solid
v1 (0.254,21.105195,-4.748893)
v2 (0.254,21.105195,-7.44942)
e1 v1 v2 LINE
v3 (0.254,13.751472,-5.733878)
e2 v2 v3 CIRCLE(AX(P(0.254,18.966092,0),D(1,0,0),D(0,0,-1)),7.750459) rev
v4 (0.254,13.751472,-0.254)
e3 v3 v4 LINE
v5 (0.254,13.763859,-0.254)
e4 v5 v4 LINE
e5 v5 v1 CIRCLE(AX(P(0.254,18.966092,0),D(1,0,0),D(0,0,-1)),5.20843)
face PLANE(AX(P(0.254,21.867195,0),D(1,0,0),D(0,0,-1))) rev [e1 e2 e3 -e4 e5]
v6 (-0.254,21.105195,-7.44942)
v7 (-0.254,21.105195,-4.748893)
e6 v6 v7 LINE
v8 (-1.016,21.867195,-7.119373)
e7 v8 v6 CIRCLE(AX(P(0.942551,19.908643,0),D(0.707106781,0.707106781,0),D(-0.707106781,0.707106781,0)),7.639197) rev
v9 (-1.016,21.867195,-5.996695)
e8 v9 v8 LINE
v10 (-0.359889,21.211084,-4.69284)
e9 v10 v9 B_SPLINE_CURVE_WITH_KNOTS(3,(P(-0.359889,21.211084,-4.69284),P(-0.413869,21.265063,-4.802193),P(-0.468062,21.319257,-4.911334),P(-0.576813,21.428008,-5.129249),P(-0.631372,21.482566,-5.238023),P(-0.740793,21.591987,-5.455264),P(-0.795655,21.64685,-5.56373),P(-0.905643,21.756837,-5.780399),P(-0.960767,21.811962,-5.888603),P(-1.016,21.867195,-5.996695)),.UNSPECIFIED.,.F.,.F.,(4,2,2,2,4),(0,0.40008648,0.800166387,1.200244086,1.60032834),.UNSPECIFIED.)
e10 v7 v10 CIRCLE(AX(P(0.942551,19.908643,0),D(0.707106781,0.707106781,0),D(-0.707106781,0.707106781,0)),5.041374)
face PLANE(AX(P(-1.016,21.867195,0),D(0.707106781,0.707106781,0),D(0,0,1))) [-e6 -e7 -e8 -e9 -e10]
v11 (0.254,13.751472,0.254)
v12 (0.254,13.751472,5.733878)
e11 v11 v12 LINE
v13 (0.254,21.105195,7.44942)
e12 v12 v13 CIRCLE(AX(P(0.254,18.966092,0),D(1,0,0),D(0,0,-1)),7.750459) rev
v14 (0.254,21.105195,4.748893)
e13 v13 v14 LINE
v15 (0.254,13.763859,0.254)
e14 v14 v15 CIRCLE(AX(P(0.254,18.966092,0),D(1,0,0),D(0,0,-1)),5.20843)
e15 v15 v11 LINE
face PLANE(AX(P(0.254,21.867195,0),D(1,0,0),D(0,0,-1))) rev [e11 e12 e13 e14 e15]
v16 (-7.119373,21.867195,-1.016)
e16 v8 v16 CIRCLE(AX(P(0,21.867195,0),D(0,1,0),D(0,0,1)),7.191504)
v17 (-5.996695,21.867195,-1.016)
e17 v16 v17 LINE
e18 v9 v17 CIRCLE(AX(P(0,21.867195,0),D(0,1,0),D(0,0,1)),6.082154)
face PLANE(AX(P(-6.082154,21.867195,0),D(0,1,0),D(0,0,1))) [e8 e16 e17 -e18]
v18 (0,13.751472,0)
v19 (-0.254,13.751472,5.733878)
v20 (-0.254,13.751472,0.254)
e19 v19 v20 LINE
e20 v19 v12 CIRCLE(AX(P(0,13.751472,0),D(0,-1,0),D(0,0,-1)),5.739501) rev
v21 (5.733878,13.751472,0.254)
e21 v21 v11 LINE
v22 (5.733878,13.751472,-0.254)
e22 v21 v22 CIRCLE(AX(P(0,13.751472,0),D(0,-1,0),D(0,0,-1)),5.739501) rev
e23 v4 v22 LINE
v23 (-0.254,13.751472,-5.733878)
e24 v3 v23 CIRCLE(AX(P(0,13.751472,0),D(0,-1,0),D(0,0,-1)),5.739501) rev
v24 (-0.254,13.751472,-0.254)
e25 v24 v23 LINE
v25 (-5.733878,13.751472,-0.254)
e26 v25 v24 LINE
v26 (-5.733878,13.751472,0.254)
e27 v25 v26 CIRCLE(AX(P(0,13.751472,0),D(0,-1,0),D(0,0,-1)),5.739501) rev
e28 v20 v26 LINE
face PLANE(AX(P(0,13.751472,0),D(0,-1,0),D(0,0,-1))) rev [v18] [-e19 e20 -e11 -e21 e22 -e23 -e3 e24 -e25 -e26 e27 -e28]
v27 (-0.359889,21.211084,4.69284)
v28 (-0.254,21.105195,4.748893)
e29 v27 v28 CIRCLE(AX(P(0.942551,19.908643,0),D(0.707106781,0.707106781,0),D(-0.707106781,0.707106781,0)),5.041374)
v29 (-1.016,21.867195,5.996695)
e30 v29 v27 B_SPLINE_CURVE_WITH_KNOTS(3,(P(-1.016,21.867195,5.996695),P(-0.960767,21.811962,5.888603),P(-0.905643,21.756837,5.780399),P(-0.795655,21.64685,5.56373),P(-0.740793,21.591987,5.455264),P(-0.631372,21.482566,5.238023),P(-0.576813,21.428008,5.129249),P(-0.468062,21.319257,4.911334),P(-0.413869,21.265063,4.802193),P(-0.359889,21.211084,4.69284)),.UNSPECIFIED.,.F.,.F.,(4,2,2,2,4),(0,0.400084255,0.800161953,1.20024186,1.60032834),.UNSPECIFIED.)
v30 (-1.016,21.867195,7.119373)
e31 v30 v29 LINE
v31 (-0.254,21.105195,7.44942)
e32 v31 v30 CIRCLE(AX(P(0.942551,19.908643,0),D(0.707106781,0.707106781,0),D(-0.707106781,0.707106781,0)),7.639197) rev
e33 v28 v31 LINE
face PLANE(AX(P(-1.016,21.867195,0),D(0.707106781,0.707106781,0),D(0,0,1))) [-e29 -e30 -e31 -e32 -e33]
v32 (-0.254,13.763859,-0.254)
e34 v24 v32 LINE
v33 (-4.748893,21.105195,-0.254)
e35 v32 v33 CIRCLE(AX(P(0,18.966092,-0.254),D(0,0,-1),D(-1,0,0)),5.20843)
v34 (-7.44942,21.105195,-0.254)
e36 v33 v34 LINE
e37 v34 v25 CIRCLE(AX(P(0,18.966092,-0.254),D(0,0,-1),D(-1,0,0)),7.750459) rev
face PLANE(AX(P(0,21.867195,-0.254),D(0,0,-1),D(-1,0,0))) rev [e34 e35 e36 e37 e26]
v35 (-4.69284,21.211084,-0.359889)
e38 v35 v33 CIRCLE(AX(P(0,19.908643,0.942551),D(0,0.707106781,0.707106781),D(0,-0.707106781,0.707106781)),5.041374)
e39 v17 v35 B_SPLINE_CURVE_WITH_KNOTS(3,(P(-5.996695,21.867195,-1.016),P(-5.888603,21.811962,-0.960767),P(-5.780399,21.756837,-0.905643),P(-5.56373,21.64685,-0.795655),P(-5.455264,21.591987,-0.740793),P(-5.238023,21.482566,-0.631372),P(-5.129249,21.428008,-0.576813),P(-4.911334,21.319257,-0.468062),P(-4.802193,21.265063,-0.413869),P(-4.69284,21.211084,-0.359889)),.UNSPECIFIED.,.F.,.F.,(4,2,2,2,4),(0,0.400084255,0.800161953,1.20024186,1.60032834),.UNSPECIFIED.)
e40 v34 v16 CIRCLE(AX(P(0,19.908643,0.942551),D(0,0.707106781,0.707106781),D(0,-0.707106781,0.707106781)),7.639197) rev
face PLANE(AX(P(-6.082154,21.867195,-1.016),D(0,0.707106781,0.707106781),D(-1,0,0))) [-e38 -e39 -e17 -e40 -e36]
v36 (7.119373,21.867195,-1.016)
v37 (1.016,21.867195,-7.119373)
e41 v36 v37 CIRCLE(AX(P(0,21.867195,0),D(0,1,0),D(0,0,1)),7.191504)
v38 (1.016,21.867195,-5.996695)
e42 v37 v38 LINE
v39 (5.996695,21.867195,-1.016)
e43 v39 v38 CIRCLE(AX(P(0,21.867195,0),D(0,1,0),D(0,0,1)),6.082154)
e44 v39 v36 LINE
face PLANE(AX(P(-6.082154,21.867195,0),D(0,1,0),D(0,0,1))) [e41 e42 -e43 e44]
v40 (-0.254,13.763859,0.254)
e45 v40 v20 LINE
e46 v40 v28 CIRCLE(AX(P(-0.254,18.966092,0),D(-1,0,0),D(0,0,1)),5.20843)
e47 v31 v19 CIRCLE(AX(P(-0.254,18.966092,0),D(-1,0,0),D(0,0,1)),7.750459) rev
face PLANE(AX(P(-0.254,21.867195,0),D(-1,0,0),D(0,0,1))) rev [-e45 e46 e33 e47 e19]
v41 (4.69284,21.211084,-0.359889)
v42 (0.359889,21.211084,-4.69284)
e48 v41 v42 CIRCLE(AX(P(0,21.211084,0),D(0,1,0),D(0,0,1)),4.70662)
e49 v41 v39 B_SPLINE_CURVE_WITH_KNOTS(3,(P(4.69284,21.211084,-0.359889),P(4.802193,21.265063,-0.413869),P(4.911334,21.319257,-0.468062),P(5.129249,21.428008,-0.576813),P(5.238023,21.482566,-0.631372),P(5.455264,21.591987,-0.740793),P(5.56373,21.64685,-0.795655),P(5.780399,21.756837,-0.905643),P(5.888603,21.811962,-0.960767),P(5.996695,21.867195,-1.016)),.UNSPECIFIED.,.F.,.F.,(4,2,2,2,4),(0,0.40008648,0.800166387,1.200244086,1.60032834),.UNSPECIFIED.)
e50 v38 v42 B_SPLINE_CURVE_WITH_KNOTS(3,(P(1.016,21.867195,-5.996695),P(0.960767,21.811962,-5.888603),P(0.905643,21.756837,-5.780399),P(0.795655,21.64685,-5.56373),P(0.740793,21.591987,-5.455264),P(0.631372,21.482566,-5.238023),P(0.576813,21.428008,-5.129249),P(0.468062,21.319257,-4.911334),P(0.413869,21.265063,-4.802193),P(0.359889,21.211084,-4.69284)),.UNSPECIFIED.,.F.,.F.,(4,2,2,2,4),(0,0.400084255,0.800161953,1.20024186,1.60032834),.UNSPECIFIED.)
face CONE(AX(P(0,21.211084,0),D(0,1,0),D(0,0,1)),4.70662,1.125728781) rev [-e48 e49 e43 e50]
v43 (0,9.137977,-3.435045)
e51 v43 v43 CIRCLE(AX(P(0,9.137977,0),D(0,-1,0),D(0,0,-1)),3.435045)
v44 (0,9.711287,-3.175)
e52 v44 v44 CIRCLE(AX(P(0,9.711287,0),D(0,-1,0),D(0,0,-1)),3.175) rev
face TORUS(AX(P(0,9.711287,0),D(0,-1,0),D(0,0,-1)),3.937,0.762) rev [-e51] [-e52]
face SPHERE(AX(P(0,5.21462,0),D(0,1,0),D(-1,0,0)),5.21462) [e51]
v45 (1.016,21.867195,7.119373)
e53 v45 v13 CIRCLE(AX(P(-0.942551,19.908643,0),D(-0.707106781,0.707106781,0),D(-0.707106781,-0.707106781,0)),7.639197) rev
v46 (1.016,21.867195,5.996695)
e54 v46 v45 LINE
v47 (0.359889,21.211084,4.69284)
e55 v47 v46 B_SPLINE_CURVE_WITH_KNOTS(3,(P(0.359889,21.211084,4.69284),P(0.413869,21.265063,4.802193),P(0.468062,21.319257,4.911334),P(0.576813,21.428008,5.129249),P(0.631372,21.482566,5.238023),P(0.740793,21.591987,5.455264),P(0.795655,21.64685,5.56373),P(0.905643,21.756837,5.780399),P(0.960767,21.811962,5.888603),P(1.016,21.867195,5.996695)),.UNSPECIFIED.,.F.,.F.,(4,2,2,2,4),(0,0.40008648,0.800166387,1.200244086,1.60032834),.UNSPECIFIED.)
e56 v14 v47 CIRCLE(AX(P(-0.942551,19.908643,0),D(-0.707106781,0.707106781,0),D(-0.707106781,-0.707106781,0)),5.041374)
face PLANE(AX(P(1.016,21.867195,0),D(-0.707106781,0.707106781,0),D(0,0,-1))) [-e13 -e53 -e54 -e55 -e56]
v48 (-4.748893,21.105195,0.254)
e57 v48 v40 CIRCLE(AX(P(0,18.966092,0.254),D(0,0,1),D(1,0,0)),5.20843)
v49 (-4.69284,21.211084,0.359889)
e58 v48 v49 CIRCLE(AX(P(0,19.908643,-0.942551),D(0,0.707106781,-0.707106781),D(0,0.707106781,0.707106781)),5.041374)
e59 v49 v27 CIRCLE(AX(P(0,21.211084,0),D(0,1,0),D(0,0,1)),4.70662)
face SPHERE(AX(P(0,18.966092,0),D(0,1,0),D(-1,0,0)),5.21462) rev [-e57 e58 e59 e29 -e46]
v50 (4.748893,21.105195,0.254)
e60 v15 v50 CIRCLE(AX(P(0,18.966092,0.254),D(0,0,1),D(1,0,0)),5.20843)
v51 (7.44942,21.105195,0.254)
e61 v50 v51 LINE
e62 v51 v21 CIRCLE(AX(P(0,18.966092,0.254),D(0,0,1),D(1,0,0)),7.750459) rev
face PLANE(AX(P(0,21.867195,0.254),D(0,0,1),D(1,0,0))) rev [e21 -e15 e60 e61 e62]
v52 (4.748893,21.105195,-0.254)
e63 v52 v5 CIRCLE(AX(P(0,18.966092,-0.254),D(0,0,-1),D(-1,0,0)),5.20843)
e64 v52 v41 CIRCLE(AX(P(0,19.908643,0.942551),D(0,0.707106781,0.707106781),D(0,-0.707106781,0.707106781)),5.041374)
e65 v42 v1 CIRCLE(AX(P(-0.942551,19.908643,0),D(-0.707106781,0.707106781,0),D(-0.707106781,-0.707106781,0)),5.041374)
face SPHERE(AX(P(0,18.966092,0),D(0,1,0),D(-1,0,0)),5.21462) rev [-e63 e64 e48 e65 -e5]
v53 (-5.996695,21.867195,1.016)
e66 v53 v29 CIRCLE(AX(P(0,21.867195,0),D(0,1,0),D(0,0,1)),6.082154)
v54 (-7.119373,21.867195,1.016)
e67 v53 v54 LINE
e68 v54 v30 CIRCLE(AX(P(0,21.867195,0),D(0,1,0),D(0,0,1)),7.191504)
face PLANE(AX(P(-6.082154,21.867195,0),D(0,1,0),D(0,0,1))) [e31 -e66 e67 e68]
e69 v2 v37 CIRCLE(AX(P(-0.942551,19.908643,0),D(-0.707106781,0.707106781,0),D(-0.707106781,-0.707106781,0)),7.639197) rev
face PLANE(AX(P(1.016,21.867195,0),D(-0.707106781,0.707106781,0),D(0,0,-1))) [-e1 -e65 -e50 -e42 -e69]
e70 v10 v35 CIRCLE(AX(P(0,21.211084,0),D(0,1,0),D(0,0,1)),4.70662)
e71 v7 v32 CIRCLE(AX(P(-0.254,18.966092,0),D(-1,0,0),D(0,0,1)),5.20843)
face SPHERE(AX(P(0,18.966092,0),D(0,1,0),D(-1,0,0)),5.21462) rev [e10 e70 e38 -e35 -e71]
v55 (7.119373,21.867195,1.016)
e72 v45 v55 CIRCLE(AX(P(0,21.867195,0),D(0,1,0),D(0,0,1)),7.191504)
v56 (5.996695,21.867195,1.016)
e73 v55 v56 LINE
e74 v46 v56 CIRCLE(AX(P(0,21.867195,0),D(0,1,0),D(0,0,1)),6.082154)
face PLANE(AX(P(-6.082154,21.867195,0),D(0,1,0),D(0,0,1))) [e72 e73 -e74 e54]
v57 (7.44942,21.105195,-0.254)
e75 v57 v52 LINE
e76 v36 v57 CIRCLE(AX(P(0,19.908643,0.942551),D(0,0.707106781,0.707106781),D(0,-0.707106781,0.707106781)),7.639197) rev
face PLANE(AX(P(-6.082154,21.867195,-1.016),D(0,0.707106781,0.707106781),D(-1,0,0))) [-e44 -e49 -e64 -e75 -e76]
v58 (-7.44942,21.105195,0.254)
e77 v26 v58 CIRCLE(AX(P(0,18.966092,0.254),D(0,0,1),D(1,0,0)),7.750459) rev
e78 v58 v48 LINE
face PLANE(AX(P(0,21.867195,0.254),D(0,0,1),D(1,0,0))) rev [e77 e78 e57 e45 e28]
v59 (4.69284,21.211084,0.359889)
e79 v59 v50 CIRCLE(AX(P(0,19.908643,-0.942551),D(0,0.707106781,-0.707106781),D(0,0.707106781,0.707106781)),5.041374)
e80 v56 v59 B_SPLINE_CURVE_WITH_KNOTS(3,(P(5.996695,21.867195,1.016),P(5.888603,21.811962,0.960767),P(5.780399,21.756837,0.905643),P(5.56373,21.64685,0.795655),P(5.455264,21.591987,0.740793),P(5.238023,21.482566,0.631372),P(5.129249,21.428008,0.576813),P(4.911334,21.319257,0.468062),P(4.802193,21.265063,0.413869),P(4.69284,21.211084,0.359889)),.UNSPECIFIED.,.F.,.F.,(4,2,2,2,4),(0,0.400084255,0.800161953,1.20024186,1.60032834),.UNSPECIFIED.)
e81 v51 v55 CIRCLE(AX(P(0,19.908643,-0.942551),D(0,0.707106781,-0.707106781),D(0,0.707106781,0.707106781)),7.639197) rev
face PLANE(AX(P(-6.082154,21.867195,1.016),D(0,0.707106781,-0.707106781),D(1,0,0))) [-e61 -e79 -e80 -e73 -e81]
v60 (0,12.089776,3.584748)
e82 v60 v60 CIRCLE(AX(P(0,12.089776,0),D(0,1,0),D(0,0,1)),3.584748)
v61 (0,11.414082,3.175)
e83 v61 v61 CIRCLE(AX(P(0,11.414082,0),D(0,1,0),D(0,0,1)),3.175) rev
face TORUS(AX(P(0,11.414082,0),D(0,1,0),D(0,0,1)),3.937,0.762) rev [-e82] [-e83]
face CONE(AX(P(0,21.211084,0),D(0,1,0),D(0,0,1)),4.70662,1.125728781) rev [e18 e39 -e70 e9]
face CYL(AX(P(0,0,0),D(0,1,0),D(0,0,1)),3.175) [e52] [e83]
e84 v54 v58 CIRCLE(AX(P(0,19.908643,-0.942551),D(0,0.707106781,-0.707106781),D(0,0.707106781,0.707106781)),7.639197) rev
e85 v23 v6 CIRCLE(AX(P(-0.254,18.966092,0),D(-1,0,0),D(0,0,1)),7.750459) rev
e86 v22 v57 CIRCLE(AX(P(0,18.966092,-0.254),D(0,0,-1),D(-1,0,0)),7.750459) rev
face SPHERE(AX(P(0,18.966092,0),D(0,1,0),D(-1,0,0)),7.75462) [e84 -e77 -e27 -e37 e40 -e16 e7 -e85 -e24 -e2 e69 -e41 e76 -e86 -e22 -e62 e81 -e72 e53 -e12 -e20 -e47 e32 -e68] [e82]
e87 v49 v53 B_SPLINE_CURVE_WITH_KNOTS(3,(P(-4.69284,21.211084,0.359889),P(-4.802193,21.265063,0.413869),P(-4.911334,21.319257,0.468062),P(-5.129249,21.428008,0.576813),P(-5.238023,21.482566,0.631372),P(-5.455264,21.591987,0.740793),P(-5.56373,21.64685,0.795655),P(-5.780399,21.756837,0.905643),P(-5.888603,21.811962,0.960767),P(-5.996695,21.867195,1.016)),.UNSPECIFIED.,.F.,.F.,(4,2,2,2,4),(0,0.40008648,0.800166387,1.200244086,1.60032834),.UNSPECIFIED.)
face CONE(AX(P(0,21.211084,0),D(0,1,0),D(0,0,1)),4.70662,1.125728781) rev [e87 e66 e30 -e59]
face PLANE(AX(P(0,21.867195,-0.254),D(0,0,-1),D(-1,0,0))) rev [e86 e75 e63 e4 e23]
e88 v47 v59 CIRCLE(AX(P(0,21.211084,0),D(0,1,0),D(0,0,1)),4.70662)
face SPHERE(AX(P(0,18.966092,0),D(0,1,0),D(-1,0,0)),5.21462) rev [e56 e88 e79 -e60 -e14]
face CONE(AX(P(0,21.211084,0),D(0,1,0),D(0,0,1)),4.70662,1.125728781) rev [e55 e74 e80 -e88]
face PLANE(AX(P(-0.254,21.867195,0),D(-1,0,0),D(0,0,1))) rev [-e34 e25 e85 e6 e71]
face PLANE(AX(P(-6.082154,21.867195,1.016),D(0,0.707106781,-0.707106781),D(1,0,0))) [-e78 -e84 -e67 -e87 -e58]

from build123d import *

# Parameters (mm, degrees)
CUT_EXTRUDE1_SOCKET_SLIT_DEPTH  = 18.588952107
CIRPATTERN1_PATTERN_SLITS_COUNT = 4
CHAMFER1_SIZE                   = 0.762
FILLET1_R                       = 0.762


with BuildPart() as part:
    # Sketch1 → Revolve1 - main body (revolve)
    with BuildSketch(Plane.XY):
        with BuildLine():
            Line((0, 0), (0, 13.751471687))
            ThreePointArc((0, 13.751471687), (-4.410161159, 16.183513693), (-4.70662, 21.211083874))
            Line((-4.70662, 21.211083874), (-6.08215434, 21.867194596))
            Line((-6.08215434, 21.867194596), (-7.191504241, 21.867194596))
            ThreePointArc((-7.191504241, 21.867194596), (-7.193470164, 16.069866844), (-3.175, 11.891241417))
            Line((-3.175, 11.891241417), (-3.175, 9.351241417))
            ThreePointArc((-3.175, 9.351241417), (-4.937771284, 3.538112772), (0, 0))
        make_face()
    revolve(axis=Axis((0, 0, 0), (0, -1, 0)))

    # Sketch2 → Cut-Extrude1 - socket slit (cut, through all)
    with BuildSketch(Plane(origin=(0, 13.751471687, 0), x_dir=(-1, 0, 0), z_dir=(0, -1, 0))):
        with BuildLine():
            Line((0, 0.254), (9.731504241, 0.254))
            ThreePointArc((9.731504241, 0.254), (9.985504241, 0), (9.731504241, -0.254))
            Line((9.731504241, -0.254), (0, -0.254))
            ThreePointArc((0, -0.254), (-0.254, 0), (0, 0.254))
        make_face()
    cut_extrude1_socket_slit = extrude(amount=-CUT_EXTRUDE1_SOCKET_SLIT_DEPTH, mode=Mode.SUBTRACT)

    # CirPattern1 - pattern slits: Cut-Extrude1 - socket slit ×4 about axis
    cirpattern1_pattern_slits_axis = Axis((0, 0, 0), (0, 1, 0))
    for i in range(1, CIRPATTERN1_PATTERN_SLITS_COUNT):
        add(cut_extrude1_socket_slit.rotate(cirpattern1_pattern_slits_axis, i * 360 / CIRPATTERN1_PATTERN_SLITS_COUNT), mode=Mode.SUBTRACT)

    # Chamfer1
    # the kernel refuses this chamfer: 0.762 mm, written as the material it takes off along each edge
    with BuildSketch(Plane(origin=(9.146639708, 21.867194596, 0.254), x_dir=(0, 0.02749587661058728, 0.9996219169112966), z_dir=(-1, 0, 0)), Plane(origin=(0.254, 21.867194596, -9.146639708), x_dir=(0.9996219169112966, 0.02749587661058728, 0), z_dir=(0, 0, 1)), Plane(origin=(-0.254, 21.867194596, 9.146639708), x_dir=(-0.9996219169112966, 0.027495876610587285, 0), z_dir=(0, 0, -1))) as chamfer1_piece_1:
        Polygon((CHAMFER1_SIZE * 0.999621916911, -CHAMFER1_SIZE * 0.0274958766106), (-CHAMFER1_SIZE * 0.0274958766106, -CHAMFER1_SIZE * 0.999621916911), (0, 0), align=None)
    extrude(amount=5.029413832, mode=Mode.SUBTRACT)
    with BuildSketch(Plane(origin=(4.117225876, 21.867194596, -0.254), x_dir=(0, -0.9996219169112968, 0.027495876610586327), z_dir=(1, 0, 0)), Plane(origin=(-0.254, 21.867194596, -4.117225876), x_dir=(0.027495876610586327, -0.9996219169112968, 0), z_dir=(0, 0, -1)), Plane(origin=(0.254, 21.867194596, 4.117225876), x_dir=(-0.027495876610586327, -0.9996219169112968, 0), z_dir=(0, 0, 1)), Plane(origin=(-9.146639708, 21.867194596, -0.254), x_dir=(0, -0.9996219169112968, 0.027495876610586327), z_dir=(1, 0, 0)), Plane(origin=(-4.117225876, 21.867194596, 0.254), x_dir=(0, -0.9996219169112968, -0.027495876610586327), z_dir=(-1, 0, 0))) as chamfer1_piece_2:
        Polygon((CHAMFER1_SIZE * 0.999621916911, CHAMFER1_SIZE * 0.0274958766106), (-CHAMFER1_SIZE * 0.0274958766106, CHAMFER1_SIZE * 0.999621916911), (0, 0), align=None)
    extrude(amount=5.029413832, mode=Mode.SUBTRACT)

    # Fillet1
    fillet1_edges = [part.edges().sort_by_distance(p)[0] for p in [
        (3.175, 11.891241417, 0),
        (3.175, 9.351241417, 0),
    ]]
    fillet(fillet1_edges, radius=FILLET1_R)


solid = part.part
